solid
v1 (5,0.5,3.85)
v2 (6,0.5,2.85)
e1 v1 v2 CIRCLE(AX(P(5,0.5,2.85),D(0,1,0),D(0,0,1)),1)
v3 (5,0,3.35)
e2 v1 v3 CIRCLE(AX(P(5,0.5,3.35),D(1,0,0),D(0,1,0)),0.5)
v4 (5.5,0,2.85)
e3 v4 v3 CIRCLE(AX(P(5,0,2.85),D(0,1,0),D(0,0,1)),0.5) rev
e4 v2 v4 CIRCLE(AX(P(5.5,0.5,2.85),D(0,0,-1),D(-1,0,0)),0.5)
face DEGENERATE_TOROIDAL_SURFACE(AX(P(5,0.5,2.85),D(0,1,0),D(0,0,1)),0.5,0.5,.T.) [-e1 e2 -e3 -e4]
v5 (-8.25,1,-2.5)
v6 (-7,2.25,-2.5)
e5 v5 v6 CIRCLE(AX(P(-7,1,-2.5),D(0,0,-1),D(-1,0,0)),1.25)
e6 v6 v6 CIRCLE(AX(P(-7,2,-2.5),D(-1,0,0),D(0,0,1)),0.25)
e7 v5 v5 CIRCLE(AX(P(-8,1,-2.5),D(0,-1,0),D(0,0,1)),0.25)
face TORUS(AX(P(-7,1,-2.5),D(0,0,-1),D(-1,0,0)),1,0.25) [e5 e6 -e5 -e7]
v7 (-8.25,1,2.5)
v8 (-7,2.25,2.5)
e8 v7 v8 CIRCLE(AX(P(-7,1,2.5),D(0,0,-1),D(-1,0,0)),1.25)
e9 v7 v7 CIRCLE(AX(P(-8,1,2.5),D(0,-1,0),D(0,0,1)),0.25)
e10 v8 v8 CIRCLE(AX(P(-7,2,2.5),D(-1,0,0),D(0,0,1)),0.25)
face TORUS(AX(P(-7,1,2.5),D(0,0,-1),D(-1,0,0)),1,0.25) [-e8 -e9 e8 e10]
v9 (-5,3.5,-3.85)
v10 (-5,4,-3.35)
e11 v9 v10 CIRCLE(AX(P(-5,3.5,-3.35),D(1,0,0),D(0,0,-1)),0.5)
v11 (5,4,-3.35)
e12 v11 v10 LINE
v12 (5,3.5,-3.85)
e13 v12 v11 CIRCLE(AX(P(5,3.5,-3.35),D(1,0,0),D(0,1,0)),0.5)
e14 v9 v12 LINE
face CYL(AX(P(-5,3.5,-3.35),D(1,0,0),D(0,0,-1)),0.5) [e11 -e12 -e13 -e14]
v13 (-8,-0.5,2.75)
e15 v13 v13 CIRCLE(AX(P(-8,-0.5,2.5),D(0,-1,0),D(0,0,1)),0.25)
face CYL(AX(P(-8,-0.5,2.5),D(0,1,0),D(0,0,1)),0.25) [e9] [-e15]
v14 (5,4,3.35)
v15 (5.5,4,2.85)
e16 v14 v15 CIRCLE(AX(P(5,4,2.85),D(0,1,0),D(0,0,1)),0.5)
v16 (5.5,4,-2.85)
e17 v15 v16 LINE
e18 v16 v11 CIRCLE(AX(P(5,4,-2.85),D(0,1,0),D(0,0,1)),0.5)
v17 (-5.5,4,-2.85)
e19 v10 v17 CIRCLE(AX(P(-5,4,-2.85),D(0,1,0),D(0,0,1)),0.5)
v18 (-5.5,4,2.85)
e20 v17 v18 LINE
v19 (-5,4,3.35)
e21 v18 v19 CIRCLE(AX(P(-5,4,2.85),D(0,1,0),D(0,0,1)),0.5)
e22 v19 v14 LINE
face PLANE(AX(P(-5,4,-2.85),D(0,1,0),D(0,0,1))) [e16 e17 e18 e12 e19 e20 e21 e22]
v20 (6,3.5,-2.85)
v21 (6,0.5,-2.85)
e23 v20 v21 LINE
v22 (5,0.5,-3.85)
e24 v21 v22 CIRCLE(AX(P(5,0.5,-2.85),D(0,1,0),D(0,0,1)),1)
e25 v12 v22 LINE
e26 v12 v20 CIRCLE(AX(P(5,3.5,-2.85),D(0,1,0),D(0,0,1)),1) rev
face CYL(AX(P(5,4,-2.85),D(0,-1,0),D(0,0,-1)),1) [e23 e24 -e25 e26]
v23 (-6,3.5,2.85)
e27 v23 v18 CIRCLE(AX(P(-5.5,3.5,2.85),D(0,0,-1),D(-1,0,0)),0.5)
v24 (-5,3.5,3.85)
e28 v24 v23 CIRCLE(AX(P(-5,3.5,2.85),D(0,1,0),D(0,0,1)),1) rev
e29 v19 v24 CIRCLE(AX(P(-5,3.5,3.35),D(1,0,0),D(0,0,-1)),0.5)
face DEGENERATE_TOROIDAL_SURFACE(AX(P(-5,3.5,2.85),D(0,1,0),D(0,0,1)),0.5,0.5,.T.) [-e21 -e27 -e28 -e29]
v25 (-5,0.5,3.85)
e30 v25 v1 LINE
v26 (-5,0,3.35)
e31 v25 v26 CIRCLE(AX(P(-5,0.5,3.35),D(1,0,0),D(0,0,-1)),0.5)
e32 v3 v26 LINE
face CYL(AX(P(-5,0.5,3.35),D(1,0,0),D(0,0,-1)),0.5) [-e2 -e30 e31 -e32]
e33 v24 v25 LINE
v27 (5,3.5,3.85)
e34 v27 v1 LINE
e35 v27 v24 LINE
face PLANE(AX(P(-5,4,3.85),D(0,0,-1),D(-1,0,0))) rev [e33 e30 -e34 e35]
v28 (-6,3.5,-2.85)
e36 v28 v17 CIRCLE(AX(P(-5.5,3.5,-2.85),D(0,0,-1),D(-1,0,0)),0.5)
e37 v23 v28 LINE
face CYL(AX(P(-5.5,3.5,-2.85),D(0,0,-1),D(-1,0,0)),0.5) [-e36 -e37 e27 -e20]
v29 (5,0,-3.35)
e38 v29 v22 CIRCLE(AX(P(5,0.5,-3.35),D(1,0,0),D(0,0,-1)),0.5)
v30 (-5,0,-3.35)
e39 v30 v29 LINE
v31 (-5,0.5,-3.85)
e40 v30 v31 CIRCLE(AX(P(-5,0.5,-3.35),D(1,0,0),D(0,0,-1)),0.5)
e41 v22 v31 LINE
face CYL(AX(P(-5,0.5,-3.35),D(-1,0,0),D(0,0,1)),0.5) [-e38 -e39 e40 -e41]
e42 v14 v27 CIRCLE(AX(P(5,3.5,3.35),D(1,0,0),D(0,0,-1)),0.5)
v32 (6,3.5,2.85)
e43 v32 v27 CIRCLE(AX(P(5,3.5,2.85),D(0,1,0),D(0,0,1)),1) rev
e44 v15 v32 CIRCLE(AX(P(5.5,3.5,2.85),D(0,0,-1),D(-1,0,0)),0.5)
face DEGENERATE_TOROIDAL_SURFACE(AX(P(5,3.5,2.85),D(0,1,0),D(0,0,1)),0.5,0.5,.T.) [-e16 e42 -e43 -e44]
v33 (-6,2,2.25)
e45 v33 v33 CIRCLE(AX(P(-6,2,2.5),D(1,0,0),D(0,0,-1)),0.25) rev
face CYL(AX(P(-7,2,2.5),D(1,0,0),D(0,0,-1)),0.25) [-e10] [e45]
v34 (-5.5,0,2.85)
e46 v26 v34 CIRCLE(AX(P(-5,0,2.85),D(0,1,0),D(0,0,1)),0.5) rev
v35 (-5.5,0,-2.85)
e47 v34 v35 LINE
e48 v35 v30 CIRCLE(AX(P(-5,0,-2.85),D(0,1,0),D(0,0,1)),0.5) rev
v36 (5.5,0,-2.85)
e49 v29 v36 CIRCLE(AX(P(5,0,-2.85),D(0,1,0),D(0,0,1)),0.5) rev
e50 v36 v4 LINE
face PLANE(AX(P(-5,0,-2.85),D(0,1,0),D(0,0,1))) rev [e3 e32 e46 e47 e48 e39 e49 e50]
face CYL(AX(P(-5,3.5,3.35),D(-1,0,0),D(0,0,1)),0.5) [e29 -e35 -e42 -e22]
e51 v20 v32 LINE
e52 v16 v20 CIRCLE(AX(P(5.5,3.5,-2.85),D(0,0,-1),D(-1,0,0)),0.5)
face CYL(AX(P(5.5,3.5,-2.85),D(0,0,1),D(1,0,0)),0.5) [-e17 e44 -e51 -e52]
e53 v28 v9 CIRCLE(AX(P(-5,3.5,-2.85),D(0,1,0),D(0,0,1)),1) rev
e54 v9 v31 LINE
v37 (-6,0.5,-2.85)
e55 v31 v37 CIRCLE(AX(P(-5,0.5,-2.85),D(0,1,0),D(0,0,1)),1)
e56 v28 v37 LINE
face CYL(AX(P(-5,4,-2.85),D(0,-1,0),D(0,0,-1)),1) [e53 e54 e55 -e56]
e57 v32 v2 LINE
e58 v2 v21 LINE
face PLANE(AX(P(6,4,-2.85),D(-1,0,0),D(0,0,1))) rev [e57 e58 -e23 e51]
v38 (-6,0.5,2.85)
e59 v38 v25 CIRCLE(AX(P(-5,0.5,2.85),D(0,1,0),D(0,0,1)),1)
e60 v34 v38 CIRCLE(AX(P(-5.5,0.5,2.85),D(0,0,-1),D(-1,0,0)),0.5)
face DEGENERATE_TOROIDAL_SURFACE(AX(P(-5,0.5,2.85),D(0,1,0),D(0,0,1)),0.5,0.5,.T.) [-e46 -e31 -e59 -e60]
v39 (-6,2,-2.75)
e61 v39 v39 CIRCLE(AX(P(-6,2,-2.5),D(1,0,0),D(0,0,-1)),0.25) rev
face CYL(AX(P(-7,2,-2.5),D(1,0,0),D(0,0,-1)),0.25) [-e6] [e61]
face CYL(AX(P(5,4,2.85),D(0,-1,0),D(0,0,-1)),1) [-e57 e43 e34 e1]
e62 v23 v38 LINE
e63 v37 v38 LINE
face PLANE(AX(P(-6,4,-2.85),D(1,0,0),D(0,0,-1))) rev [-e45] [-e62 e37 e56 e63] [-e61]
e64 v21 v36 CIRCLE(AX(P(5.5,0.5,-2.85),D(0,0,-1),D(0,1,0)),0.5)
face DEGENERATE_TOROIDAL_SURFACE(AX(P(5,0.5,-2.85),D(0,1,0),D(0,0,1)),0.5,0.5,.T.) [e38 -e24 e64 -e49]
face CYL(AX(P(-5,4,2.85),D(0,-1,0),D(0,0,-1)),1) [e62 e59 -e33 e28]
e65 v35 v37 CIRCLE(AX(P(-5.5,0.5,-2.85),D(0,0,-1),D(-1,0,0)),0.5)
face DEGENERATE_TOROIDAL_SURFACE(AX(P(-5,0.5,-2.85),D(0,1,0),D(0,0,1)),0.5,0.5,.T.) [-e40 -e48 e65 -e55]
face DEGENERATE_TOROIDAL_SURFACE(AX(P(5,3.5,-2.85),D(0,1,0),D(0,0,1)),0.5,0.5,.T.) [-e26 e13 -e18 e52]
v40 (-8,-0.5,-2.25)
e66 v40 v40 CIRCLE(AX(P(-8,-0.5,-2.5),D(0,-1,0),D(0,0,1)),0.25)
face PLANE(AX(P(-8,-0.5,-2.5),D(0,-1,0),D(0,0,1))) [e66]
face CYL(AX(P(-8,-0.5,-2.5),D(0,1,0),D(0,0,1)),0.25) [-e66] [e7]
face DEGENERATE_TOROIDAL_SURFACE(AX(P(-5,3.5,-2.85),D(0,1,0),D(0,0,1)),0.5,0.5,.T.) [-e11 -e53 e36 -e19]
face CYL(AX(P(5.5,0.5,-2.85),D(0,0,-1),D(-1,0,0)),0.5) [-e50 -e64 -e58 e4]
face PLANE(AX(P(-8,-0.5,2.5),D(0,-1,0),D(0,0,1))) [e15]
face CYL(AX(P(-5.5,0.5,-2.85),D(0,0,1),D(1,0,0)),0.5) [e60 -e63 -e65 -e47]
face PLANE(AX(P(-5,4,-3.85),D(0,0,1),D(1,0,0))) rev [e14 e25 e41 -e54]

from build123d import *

# Parameters (mm, degrees)
EXTRUDE_1_DEPTH = 4
SKETCH_2_R      = 0.25
FILLET_1_R      = 0.5
FILLET_2_R      = 0.5


with BuildPart() as part:
    # Эскиз1 → Бобышка-Вытянуть1 (new body)
    with BuildSketch(Plane(origin=(0, 0, 0), x_dir=(1, 0, 0), z_dir=(0, 1, 0))):
        with BuildLine():
            Line((-5, 3.85), (5, 3.85))
            ThreePointArc((5, 3.85), (5.707106781, 3.557106781), (6, 2.85))
            Line((6, 2.85), (6, -2.85))
            ThreePointArc((6, -2.85), (5.707106781, -3.557106781), (5, -3.85))
            Line((5, -3.85), (-5, -3.85))
            ThreePointArc((-5, -3.85), (-5.707106781, -3.557106781), (-6, -2.85))
            Line((-6, -2.85), (-6, 2.85))
            ThreePointArc((-6, 2.85), (-5.707106781, 3.557106781), (-5, 3.85))
        make_face()
    extrude(amount=EXTRUDE_1_DEPTH)

    # По траектории4: sweep along a curve in space
    with BuildLine() as sweep_4_path:
        Line((-6, 2, -2.5), (-7, 2, -2.5))
        ThreePointArc((-8, 1, -2.5), (-7.707106781, 1.707106781, -2.5), (-7, 2, -2.5))
        Line((-8, 1, -2.5), (-8, -0.5, -2.5))
    # Эскиз2 → По траектории4 (sweep)
    with BuildSketch(Plane.ZY.offset(6)):
        with Locations((-2.5, 2)):
            Circle(SKETCH_2_R)
        with Locations((2.5, 2)):
            Circle(SKETCH_2_R)
    sweep(path=sweep_4_path.line)

    # Скругление1
    fillet_1_edges = [part.edges().sort_by_distance(p)[0] for p in [
        (5.707106781, 4, -3.557106781),
        (6, 4, 0),
        (5.707106781, 4, 3.557106781),
        (0, 4, 3.85),
        (-5.707106781, 4, 3.557106781),
        (-6, 4, 0),
        (-5.707106781, 4, -3.557106781),
        (0, 4, -3.85),
    ]]
    fillet(fillet_1_edges, radius=FILLET_1_R)

    # Скругление2
    fillet_2_edges = [part.edges().sort_by_distance(p)[0] for p in [
        (5.707106781, 0, -3.557106781),
        (6, 0, 0),
        (5.707106781, 0, 3.557106781),
        (0, 0, 3.85),
        (-5.707106781, 0, 3.557106781),
        (-6, 0, 0),
        (-5.707106781, 0, -3.557106781),
        (0, 0, -3.85),
    ]]
    fillet(fillet_2_edges, radius=FILLET_2_R)


solid = part.part
